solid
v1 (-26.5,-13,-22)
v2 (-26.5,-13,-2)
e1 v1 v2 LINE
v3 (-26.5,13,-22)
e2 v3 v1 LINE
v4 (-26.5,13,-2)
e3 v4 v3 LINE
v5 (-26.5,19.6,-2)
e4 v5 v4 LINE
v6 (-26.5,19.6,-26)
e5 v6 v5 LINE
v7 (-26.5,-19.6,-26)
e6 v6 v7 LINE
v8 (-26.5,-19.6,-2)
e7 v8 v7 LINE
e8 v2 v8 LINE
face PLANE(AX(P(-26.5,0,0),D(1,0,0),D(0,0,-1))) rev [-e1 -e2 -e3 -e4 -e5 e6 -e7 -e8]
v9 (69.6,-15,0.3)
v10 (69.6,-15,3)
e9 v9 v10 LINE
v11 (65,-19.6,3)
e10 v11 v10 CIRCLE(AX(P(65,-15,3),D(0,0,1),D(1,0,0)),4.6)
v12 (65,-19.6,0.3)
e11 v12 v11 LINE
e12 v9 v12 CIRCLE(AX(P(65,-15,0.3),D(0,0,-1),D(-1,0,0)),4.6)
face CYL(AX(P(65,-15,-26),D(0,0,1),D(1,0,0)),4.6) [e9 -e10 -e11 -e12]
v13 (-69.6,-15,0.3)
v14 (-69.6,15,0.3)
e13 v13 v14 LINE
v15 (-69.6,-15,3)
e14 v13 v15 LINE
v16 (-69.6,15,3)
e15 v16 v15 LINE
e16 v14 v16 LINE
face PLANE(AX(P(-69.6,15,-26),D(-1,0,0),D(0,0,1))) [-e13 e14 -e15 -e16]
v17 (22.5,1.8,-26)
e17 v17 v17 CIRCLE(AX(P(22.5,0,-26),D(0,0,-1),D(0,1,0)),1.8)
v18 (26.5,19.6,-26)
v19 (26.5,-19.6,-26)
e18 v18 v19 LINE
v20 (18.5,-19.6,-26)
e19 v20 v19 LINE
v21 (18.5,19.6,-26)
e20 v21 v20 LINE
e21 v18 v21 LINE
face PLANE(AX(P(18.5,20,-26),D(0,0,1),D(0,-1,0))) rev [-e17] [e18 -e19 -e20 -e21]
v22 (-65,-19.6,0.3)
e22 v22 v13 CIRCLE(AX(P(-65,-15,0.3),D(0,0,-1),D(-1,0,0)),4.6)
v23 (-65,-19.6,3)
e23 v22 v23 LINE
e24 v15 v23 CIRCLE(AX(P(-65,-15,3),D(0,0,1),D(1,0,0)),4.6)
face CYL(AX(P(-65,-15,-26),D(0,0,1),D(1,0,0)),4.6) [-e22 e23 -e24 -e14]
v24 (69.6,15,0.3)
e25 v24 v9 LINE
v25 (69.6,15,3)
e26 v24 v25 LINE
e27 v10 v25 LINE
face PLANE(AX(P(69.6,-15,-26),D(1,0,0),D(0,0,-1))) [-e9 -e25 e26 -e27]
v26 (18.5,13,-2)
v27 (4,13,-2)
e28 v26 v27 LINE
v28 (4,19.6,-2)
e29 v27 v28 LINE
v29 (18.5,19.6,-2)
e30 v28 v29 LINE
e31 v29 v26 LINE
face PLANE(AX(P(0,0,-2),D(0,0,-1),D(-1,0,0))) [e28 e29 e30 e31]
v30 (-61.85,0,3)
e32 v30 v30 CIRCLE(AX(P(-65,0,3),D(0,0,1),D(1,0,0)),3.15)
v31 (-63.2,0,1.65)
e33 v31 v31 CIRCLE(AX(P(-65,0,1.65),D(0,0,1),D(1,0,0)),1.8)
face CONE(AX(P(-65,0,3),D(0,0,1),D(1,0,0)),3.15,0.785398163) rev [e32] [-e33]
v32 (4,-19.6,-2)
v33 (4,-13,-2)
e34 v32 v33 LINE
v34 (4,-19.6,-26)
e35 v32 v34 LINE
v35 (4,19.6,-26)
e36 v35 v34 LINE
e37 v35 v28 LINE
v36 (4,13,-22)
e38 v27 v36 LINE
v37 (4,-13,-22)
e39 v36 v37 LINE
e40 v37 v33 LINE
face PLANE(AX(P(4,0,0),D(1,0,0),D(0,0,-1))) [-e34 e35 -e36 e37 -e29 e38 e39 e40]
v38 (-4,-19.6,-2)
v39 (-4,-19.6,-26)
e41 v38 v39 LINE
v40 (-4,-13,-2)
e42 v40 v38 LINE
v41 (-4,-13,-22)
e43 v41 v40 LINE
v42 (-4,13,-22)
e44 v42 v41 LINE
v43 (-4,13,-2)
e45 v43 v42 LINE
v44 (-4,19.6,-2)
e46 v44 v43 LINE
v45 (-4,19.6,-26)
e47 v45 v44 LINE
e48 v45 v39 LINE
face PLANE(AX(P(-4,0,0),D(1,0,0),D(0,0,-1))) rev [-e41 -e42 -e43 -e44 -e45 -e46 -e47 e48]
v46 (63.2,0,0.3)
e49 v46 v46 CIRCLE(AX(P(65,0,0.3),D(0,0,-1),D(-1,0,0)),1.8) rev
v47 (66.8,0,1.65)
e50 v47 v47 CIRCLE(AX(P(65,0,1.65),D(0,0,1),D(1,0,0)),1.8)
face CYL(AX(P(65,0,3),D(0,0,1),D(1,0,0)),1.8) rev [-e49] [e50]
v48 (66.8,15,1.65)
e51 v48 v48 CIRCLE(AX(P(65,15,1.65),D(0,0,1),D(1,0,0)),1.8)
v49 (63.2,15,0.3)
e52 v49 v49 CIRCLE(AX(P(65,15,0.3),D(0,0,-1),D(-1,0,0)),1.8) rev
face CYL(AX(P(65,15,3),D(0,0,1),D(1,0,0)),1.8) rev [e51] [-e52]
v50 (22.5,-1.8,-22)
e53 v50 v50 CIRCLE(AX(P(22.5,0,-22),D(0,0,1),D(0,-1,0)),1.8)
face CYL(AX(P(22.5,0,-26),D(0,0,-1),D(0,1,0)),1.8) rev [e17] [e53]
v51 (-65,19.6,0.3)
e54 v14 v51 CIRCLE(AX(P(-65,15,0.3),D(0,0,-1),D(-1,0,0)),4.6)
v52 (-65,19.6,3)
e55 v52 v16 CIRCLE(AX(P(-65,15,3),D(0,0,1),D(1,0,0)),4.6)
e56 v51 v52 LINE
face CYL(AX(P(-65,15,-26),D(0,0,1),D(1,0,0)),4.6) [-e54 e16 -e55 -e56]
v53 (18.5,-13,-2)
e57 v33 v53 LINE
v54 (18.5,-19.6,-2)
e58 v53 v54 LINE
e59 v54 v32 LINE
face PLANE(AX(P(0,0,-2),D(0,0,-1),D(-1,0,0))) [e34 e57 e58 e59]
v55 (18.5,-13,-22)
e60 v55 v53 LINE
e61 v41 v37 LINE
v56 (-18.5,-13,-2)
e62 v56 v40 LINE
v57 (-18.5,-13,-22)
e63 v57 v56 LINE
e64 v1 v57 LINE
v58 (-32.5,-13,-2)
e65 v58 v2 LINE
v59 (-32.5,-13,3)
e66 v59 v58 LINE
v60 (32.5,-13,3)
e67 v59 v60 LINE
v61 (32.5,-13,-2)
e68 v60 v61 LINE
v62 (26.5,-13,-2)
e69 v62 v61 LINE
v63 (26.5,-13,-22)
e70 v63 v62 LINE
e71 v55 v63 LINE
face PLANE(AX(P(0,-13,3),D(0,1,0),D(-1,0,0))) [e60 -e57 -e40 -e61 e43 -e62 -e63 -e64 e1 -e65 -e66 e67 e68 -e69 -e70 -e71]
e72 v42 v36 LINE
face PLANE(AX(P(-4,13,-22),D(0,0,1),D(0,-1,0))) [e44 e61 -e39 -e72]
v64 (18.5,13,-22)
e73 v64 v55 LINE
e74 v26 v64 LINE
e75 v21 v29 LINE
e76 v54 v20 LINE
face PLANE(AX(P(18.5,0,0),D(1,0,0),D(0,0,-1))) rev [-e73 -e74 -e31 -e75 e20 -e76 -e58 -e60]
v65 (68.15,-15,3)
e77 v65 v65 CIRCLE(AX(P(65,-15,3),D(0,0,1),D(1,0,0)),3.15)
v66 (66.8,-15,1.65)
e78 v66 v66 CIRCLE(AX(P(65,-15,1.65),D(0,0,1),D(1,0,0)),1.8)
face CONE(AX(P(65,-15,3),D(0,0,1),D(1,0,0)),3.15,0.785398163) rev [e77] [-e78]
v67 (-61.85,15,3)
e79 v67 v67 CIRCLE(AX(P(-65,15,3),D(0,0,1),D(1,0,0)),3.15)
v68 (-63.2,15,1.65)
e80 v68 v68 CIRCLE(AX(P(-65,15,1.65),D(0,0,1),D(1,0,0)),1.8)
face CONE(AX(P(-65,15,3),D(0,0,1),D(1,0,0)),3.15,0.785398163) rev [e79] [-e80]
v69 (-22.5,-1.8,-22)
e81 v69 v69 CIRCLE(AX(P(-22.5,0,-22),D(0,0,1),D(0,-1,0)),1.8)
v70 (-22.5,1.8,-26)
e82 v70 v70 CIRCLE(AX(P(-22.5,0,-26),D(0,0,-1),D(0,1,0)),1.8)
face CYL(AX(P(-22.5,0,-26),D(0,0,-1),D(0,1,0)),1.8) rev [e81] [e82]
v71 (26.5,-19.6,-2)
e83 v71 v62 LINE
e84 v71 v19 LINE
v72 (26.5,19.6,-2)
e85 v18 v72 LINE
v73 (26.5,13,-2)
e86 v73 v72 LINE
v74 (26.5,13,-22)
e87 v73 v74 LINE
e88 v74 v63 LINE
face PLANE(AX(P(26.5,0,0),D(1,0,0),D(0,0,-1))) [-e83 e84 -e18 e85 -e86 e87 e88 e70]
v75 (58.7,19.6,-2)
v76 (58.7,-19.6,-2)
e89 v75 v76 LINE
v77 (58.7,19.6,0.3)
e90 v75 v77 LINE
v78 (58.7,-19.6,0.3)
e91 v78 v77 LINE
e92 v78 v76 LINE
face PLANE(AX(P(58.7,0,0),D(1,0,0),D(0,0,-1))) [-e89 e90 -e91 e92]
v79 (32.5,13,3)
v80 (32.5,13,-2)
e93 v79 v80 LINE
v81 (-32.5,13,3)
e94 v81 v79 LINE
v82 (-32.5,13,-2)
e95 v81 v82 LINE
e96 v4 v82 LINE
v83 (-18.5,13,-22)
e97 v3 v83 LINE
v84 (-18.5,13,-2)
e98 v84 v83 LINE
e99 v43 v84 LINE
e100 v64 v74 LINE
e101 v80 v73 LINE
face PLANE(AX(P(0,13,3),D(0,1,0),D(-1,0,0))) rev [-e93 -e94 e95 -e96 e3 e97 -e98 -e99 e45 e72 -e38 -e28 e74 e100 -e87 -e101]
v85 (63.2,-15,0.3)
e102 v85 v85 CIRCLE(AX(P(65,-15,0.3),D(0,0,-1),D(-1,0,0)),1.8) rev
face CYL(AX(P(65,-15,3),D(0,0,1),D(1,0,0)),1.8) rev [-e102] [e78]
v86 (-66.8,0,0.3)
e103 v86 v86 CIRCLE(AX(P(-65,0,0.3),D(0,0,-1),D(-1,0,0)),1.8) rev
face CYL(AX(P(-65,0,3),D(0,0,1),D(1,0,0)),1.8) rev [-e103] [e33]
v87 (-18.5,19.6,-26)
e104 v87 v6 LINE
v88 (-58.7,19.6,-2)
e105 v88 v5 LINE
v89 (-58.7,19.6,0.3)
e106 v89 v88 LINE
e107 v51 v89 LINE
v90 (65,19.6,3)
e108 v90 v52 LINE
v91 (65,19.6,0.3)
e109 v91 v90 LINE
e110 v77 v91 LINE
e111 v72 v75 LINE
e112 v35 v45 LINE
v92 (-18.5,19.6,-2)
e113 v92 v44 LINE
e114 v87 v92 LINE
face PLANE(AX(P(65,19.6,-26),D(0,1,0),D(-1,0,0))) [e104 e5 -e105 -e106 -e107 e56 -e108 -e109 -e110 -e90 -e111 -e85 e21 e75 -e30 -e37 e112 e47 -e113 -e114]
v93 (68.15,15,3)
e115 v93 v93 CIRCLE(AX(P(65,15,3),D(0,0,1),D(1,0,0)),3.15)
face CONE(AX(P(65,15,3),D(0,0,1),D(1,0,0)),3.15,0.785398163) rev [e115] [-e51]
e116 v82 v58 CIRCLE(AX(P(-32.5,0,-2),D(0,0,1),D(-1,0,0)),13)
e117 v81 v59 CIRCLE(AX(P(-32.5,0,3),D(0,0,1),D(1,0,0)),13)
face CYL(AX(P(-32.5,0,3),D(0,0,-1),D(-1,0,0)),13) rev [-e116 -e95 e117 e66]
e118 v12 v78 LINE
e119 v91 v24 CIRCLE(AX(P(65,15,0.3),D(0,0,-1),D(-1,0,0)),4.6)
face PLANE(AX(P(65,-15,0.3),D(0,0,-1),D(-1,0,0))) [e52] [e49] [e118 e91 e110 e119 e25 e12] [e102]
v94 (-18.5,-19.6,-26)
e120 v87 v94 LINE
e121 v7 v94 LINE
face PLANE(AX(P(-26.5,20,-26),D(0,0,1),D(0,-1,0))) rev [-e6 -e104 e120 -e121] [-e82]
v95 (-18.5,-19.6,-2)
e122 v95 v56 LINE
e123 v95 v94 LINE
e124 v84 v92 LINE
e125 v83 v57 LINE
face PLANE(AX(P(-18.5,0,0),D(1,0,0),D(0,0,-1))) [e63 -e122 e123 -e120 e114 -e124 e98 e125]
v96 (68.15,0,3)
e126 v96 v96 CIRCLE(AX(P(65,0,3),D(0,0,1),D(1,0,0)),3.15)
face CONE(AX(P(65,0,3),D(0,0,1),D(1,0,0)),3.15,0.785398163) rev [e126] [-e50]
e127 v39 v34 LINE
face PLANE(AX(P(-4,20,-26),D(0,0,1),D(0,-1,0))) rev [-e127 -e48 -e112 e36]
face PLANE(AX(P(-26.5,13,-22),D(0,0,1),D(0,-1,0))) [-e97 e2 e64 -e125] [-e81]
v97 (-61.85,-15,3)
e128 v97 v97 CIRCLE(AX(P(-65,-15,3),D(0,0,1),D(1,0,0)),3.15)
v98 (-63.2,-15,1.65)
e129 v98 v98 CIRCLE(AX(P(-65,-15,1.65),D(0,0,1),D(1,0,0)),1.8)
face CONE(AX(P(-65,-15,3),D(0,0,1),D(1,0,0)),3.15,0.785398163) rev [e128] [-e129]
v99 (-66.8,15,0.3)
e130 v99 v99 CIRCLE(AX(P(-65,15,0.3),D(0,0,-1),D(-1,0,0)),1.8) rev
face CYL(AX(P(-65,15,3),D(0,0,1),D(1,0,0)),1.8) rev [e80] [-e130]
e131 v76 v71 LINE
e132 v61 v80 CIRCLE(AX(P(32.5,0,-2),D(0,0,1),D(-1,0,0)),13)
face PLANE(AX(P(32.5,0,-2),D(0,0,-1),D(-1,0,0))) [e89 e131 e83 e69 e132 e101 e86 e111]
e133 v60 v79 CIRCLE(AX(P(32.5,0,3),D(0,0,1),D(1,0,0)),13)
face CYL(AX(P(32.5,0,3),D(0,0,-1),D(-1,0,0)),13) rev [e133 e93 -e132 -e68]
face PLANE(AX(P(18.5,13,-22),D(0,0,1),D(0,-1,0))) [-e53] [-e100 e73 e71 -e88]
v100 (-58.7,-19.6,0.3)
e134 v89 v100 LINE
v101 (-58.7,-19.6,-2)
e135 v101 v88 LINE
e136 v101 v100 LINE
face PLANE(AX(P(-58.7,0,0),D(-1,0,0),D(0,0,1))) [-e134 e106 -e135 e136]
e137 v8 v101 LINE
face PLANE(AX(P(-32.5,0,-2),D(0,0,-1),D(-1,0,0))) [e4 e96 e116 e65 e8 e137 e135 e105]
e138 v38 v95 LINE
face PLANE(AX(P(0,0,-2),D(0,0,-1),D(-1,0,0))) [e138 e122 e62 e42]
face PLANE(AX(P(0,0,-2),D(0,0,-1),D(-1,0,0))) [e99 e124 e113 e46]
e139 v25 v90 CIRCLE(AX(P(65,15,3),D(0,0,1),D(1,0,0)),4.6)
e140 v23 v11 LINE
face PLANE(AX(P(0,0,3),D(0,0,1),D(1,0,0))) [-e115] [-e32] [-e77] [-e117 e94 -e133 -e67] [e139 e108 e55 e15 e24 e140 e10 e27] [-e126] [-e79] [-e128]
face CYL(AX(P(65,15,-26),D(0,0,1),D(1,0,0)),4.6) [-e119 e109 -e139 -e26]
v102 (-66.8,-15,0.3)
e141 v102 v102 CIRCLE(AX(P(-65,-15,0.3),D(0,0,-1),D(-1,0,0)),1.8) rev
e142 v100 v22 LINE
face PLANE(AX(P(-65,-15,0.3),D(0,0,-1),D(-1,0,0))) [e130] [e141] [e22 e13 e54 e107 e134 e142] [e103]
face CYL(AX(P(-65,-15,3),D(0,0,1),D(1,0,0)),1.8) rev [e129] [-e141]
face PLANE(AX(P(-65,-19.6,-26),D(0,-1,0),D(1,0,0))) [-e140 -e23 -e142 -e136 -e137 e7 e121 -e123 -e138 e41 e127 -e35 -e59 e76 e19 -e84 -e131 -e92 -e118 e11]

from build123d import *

# Parameters (mm, degrees)
SKETCH1_W                = 118
SKETCH1_H                = 40
SKETCH1_W_2              = 11
BOSS_EXTRUDE1_DEPTH      = 3
BOSS_EXTRUDE2_START      = -5
SKETCH1_3_W              = 118
SKETCH1_3_H              = 40
BOSS_EXTRUDE2_DEPTH      = 5
FILLET1_R                = 5
BOSS_EXTRUDE3_DEPTH      = 4
LPATTERN1_COUNT          = 2
LPATTERN1_PITCH          = 22.5
LPATTERN1_COL_COUNT      = 2
LPATTERN1_COL_PITCH      = 22.5
M3_CLEARANCE_HOLE1_D     = 3.6
M3_CLEARANCE_HOLE1_DEPTH = 9
M3_CLEARANCE_HOLE1_TIP   = 1.081549114
CUT_EXTRUDE2_DEPTH       = 79.364532794
SKETCH12_W               = 5
SKETCH12_H               = 39.2
CUT_EXTRUDE3_DEPTH       = 0.3
SKETCH13_W               = 5
SKETCH13_H               = 39.2
CUT_EXTRUDE4_DEPTH       = 0.3
CUT_EXTRUDE5_START       = -0.3
CUT_EXTRUDE5_DEPTH       = 0.3
SKETCH16_W               = 14.5
SKETCH16_H               = 6.6
CUT_EXTRUDE7_DEPTH       = 3


# Read off the part's stored shape, not the designer's step: CSK for M3 Flat Head Machine Screw1
with BuildPart() as part:
    # Sketch1 → Boss-Extrude1 (new body)
    # profile 1 of 3: a face of its own
    with BuildSketch(Plane.XY):
        Rectangle(SKETCH1_W, SKETCH1_H)
        with BuildLine():
            ThreePointArc((-32.5, -13), (-45.5, 0), (-32.5, 13))
            Line((-32.5, 13), (32.5, 13))
            ThreePointArc((32.5, 13), (45.5, 0), (32.5, -13))
            Line((32.5, -13), (-32.5, -13))
        make_face(mode=Mode.SUBTRACT)
    # profile 2 of 3: a face of its own
    with BuildSketch(Plane.XY):
        with Locations((-64.5, 0)):
            Rectangle(SKETCH1_W_2, SKETCH1_H)
    # profile 3 of 3: a face of its own
    with BuildSketch(Plane.XY):
        with Locations((64.5, 0)):
            Rectangle(SKETCH1_W_2, SKETCH1_H)
    extrude(amount=BOSS_EXTRUDE1_DEPTH)

    # Sketch1<3> → Boss-Extrude2 (add)
    with BuildSketch(Plane.XY.offset(BOSS_EXTRUDE2_START)):
        Rectangle(SKETCH1_3_W, SKETCH1_3_H)
        with BuildLine():
            ThreePointArc((-32.5, -13), (-45.5, 0), (-32.5, 13))
            Line((-32.5, 13), (32.5, 13))
            ThreePointArc((32.5, 13), (45.5, 0), (32.5, -13))
            Line((32.5, -13), (-32.5, -13))
        make_face(mode=Mode.SUBTRACT)
    extrude(amount=BOSS_EXTRUDE2_DEPTH)

    # CSK for M3 Flat Head Machine Screw1 outl → CSK for M3 Flat Head Machine Screw1 (revolve, cut)
    with BuildSketch(Plane(origin=(65, 0, 0), x_dir=(1, 0, 0), z_dir=(0, -1, 0))):
        Polygon((0, 0), (1.8, 0), (1.8, 1.65), (3.15, 3), (0, 3), align=None)
    revolve(axis=Axis((65, 0, 0), (0, 0, 1)), mode=Mode.SUBTRACT)

    # CSK for M3 Flat Head Machine Screw1 2 ou → CSK for M3 Flat Head Machine Screw1 2 (revolve, cut)
    with BuildSketch(Plane(origin=(-65, 0, 0), x_dir=(1, 0, 0), z_dir=(0, -1, 0))):
        Polygon((0, 0), (1.8, 0), (1.8, 1.65), (3.15, 3), (0, 3), align=None)
    revolve(axis=Axis((-65, 0, 0), (0, 0, 1)), mode=Mode.SUBTRACT)

    # CSK for M3 Flat Head Machine Screw1 3 ou → CSK for M3 Flat Head Machine Screw1 3 (revolve, cut)
    with BuildSketch(Plane(origin=(-65, -15, 0), x_dir=(1, 0, 0), z_dir=(0, -1, 0))):
        Polygon((0, 0), (1.8, 0), (1.8, 1.65), (3.15, 3), (0, 3), align=None)
    revolve(axis=Axis((-65, -15, 0), (0, 0, 1)), mode=Mode.SUBTRACT)

    # CSK for M3 Flat Head Machine Screw1 4 ou → CSK for M3 Flat Head Machine Screw1 4 (revolve, cut)
    with BuildSketch(Plane(origin=(65, 15, 0), x_dir=(1, 0, 0), z_dir=(0, -1, 0))):
        Polygon((0, 0), (1.8, 0), (1.8, 1.65), (3.15, 3), (0, 3), align=None)
    revolve(axis=Axis((65, 15, 0), (0, 0, 1)), mode=Mode.SUBTRACT)

    # CSK for M3 Flat Head Machine Screw1 5 ou → CSK for M3 Flat Head Machine Screw1 5 (revolve, cut)
    with BuildSketch(Plane(origin=(65, -15, 0), x_dir=(1, 0, 0), z_dir=(0, -1, 0))):
        Polygon((0, 0), (1.8, 0), (1.8, 1.65), (3.15, 3), (0, 3), align=None)
    revolve(axis=Axis((65, -15, 0), (0, 0, 1)), mode=Mode.SUBTRACT)

    # CSK for M3 Flat Head Machine Screw1 6 ou → CSK for M3 Flat Head Machine Screw1 6 (revolve, cut)
    with BuildSketch(Plane(origin=(-65, 15, 0), x_dir=(1, 0, 0), z_dir=(0, -1, 0))):
        Polygon((0, 0), (1.8, 0), (1.8, 1.65), (3.15, 3), (0, 3), align=None)
    revolve(axis=Axis((-65, 15, 0), (0, 0, 1)), mode=Mode.SUBTRACT)

    # Fillet1
    fillet1_edges = [part.edges().sort_by_distance(p)[0] for p in [
        (-70, -20, 1.5),
        (-70, 20, 1.5),
        (70, 20, 1.5),
        (70, -20, 1.5),
    ]]
    fillet(fillet1_edges, radius=FILLET1_R)

    # Sketch5 → Boss-Extrude3 (add, symmetric)
    with BuildSketch(Plane(origin=(0, 0, 0), x_dir=(0, 0, -1), z_dir=(1, 0, 0))):
        Polygon((5, -13), (5, -20), (26, -20), (26, 20), (5, 20), (5, 13), (22, 13), (22, -13), align=None)
    boss_extrude3 = extrude(amount=BOSS_EXTRUDE3_DEPTH, both=True)

    # LPattern1: Boss-Extrude3 ×2
    with Locations(*[(i * LPATTERN1_PITCH, 0, 0) for i in range(1, LPATTERN1_COUNT)]):
        add(boss_extrude3)

    # LPattern1 col: Boss-Extrude3 ×2
    with Locations(*[(-i * LPATTERN1_COL_PITCH, 0, 0) for i in range(1, LPATTERN1_COL_COUNT)]):
        add(boss_extrude3)

    # M3 Clearance Hole1
    with Locations(Plane(origin=(0, 0, -26), x_dir=(-1, 0, 0), z_dir=(0, 0, -1))):
        with Locations((-22.5, 0), (22.5, 0)):
            Hole(M3_CLEARANCE_HOLE1_D / 2, depth=M3_CLEARANCE_HOLE1_DEPTH)
            with Locations((0, 0, -(M3_CLEARANCE_HOLE1_DEPTH + M3_CLEARANCE_HOLE1_TIP / 2))):  # 118° drill point
                Cone(0, M3_CLEARANCE_HOLE1_D / 2, M3_CLEARANCE_HOLE1_TIP, mode=Mode.SUBTRACT)

    # Sketch10 → Cut-Extrude2 (cut, through all)
    with BuildSketch(Plane.XY.offset(3)):
        with BuildLine():
            Line((70, -15), (70, 15))
            ThreePointArc((70, 15), (68.535533906, 18.535533906), (65, 20))
            Line((65, 20), (-65, 20))
            ThreePointArc((-65, 20), (-68.535533906, 18.535533906), (-70, 15))
            Line((-70, 15), (-70, -15))
            ThreePointArc((-70, -15), (-68.535533906, -18.535533906), (-65, -20))
            Line((-65, -20), (65, -20))
            ThreePointArc((65, -20), (68.535533906, -18.535533906), (70, -15))
        make_face()
        with BuildLine():
            Line((69.6, -15), (69.6, 15))
            ThreePointArc((69.6, 15), (68.252691193, 18.252691193), (65, 19.6))
            Line((65, 19.6), (-65, 19.6))
            ThreePointArc((-65, 19.6), (-68.252691193, 18.252691193), (-69.6, 15))
            Line((-69.6, 15), (-69.6, -15))
            ThreePointArc((-69.6, -15), (-68.252691193, -18.252691193), (-65, -19.6))
            Line((-65, -19.6), (65, -19.6))
            ThreePointArc((65, -19.6), (68.252691193, -18.252691193), (69.6, -15))
        make_face(mode=Mode.SUBTRACT)
    extrude(amount=-CUT_EXTRUDE2_DEPTH, mode=Mode.SUBTRACT)

    # Sketch12 → Cut-Extrude3 (cut)
    with BuildSketch(Plane(origin=(59, 0, 0), x_dir=(0, 0, -1), z_dir=(1, 0, 0))):
        with Locations((2.5, 0)):
            Rectangle(SKETCH12_W, SKETCH12_H)
    extrude(amount=-CUT_EXTRUDE3_DEPTH, mode=Mode.SUBTRACT)

    # Sketch13 → Cut-Extrude4 (cut)
    with BuildSketch(Plane.ZY.offset(59)):
        with Locations((-2.5, 0)):
            Rectangle(SKETCH13_W, SKETCH13_H)
    extrude(amount=-CUT_EXTRUDE4_DEPTH, mode=Mode.SUBTRACT)

    # Sketch14 → Cut-Extrude5 (cut)
    with BuildSketch(Plane(origin=(0, 0, 0), x_dir=(-1, 0, 0), z_dir=(0, 0, -1)).offset(CUT_EXTRUDE5_START)):
        with BuildLine():
            Line((-65, -19.6), (-58.7, -19.6))
            Line((-58.7, -19.6), (-58.7, 19.6))
            Line((-58.7, 19.6), (-65, 19.6))
            ThreePointArc((-65, 19.6), (-68.252691193, 18.252691193), (-69.6, 15))
            Line((-69.6, 15), (-69.6, -15))
            ThreePointArc((-69.6, -15), (-68.252691193, -18.252691193), (-65, -19.6))
        make_face()
        with BuildLine():
            Line((58.7, -19.6), (65, -19.6))
            ThreePointArc((65, -19.6), (68.252691193, -18.252691193), (69.6, -15))
            Line((69.6, -15), (69.6, 15))
            ThreePointArc((69.6, 15), (68.252691193, 18.252691193), (65, 19.6))
            Line((65, 19.6), (58.7, 19.6))
            Line((58.7, 19.6), (58.7, -19.6))
        make_face()
    extrude(amount=CUT_EXTRUDE5_DEPTH, mode=Mode.SUBTRACT)

    # Sketch16 → Cut-Extrude7 (cut)
    with BuildSketch(Plane(origin=(0, 0, -5), x_dir=(-1, 0, 0), z_dir=(0, 0, -1))):
        with Locations((11.25, 16.3)):
            Rectangle(SKETCH16_W, SKETCH16_H)
        with BuildLine():
            Line((58.7, -19.6), (58.7, 19.6))
            Line((58.7, 19.6), (26.5, 19.6))
            Line((26.5, 19.6), (26.5, 13))
            Line((26.5, 13), (32.5, 13))
            ThreePointArc((32.5, 13), (45.5, 0), (32.5, -13))
            Line((32.5, -13), (26.5, -13))
            Line((26.5, -13), (26.5, -19.6))
            Line((26.5, -19.6), (58.7, -19.6))
        make_face()
        with Locations((11.25, -16.3)):
            Rectangle(SKETCH16_W, SKETCH16_H)
        with Locations((-11.25, -16.3)):
            Rectangle(SKETCH16_W, SKETCH16_H)
        with Locations((-11.25, 16.3)):
            Rectangle(SKETCH16_W, SKETCH16_H)
        with BuildLine():
            Line((-58.7, 19.6), (-58.7, -19.6))
            Line((-58.7, -19.6), (-26.5, -19.6))
            Line((-26.5, -19.6), (-26.5, -13))
            Line((-26.5, -13), (-32.5, -13))
            ThreePointArc((-32.5, -13), (-45.5, 0), (-32.5, 13))
            Line((-32.5, 13), (-26.5, 13))
            Line((-26.5, 13), (-26.5, 19.6))
            Line((-26.5, 19.6), (-58.7, 19.6))
        make_face()
    extrude(amount=-CUT_EXTRUDE7_DEPTH, mode=Mode.SUBTRACT)


solid = part.part
